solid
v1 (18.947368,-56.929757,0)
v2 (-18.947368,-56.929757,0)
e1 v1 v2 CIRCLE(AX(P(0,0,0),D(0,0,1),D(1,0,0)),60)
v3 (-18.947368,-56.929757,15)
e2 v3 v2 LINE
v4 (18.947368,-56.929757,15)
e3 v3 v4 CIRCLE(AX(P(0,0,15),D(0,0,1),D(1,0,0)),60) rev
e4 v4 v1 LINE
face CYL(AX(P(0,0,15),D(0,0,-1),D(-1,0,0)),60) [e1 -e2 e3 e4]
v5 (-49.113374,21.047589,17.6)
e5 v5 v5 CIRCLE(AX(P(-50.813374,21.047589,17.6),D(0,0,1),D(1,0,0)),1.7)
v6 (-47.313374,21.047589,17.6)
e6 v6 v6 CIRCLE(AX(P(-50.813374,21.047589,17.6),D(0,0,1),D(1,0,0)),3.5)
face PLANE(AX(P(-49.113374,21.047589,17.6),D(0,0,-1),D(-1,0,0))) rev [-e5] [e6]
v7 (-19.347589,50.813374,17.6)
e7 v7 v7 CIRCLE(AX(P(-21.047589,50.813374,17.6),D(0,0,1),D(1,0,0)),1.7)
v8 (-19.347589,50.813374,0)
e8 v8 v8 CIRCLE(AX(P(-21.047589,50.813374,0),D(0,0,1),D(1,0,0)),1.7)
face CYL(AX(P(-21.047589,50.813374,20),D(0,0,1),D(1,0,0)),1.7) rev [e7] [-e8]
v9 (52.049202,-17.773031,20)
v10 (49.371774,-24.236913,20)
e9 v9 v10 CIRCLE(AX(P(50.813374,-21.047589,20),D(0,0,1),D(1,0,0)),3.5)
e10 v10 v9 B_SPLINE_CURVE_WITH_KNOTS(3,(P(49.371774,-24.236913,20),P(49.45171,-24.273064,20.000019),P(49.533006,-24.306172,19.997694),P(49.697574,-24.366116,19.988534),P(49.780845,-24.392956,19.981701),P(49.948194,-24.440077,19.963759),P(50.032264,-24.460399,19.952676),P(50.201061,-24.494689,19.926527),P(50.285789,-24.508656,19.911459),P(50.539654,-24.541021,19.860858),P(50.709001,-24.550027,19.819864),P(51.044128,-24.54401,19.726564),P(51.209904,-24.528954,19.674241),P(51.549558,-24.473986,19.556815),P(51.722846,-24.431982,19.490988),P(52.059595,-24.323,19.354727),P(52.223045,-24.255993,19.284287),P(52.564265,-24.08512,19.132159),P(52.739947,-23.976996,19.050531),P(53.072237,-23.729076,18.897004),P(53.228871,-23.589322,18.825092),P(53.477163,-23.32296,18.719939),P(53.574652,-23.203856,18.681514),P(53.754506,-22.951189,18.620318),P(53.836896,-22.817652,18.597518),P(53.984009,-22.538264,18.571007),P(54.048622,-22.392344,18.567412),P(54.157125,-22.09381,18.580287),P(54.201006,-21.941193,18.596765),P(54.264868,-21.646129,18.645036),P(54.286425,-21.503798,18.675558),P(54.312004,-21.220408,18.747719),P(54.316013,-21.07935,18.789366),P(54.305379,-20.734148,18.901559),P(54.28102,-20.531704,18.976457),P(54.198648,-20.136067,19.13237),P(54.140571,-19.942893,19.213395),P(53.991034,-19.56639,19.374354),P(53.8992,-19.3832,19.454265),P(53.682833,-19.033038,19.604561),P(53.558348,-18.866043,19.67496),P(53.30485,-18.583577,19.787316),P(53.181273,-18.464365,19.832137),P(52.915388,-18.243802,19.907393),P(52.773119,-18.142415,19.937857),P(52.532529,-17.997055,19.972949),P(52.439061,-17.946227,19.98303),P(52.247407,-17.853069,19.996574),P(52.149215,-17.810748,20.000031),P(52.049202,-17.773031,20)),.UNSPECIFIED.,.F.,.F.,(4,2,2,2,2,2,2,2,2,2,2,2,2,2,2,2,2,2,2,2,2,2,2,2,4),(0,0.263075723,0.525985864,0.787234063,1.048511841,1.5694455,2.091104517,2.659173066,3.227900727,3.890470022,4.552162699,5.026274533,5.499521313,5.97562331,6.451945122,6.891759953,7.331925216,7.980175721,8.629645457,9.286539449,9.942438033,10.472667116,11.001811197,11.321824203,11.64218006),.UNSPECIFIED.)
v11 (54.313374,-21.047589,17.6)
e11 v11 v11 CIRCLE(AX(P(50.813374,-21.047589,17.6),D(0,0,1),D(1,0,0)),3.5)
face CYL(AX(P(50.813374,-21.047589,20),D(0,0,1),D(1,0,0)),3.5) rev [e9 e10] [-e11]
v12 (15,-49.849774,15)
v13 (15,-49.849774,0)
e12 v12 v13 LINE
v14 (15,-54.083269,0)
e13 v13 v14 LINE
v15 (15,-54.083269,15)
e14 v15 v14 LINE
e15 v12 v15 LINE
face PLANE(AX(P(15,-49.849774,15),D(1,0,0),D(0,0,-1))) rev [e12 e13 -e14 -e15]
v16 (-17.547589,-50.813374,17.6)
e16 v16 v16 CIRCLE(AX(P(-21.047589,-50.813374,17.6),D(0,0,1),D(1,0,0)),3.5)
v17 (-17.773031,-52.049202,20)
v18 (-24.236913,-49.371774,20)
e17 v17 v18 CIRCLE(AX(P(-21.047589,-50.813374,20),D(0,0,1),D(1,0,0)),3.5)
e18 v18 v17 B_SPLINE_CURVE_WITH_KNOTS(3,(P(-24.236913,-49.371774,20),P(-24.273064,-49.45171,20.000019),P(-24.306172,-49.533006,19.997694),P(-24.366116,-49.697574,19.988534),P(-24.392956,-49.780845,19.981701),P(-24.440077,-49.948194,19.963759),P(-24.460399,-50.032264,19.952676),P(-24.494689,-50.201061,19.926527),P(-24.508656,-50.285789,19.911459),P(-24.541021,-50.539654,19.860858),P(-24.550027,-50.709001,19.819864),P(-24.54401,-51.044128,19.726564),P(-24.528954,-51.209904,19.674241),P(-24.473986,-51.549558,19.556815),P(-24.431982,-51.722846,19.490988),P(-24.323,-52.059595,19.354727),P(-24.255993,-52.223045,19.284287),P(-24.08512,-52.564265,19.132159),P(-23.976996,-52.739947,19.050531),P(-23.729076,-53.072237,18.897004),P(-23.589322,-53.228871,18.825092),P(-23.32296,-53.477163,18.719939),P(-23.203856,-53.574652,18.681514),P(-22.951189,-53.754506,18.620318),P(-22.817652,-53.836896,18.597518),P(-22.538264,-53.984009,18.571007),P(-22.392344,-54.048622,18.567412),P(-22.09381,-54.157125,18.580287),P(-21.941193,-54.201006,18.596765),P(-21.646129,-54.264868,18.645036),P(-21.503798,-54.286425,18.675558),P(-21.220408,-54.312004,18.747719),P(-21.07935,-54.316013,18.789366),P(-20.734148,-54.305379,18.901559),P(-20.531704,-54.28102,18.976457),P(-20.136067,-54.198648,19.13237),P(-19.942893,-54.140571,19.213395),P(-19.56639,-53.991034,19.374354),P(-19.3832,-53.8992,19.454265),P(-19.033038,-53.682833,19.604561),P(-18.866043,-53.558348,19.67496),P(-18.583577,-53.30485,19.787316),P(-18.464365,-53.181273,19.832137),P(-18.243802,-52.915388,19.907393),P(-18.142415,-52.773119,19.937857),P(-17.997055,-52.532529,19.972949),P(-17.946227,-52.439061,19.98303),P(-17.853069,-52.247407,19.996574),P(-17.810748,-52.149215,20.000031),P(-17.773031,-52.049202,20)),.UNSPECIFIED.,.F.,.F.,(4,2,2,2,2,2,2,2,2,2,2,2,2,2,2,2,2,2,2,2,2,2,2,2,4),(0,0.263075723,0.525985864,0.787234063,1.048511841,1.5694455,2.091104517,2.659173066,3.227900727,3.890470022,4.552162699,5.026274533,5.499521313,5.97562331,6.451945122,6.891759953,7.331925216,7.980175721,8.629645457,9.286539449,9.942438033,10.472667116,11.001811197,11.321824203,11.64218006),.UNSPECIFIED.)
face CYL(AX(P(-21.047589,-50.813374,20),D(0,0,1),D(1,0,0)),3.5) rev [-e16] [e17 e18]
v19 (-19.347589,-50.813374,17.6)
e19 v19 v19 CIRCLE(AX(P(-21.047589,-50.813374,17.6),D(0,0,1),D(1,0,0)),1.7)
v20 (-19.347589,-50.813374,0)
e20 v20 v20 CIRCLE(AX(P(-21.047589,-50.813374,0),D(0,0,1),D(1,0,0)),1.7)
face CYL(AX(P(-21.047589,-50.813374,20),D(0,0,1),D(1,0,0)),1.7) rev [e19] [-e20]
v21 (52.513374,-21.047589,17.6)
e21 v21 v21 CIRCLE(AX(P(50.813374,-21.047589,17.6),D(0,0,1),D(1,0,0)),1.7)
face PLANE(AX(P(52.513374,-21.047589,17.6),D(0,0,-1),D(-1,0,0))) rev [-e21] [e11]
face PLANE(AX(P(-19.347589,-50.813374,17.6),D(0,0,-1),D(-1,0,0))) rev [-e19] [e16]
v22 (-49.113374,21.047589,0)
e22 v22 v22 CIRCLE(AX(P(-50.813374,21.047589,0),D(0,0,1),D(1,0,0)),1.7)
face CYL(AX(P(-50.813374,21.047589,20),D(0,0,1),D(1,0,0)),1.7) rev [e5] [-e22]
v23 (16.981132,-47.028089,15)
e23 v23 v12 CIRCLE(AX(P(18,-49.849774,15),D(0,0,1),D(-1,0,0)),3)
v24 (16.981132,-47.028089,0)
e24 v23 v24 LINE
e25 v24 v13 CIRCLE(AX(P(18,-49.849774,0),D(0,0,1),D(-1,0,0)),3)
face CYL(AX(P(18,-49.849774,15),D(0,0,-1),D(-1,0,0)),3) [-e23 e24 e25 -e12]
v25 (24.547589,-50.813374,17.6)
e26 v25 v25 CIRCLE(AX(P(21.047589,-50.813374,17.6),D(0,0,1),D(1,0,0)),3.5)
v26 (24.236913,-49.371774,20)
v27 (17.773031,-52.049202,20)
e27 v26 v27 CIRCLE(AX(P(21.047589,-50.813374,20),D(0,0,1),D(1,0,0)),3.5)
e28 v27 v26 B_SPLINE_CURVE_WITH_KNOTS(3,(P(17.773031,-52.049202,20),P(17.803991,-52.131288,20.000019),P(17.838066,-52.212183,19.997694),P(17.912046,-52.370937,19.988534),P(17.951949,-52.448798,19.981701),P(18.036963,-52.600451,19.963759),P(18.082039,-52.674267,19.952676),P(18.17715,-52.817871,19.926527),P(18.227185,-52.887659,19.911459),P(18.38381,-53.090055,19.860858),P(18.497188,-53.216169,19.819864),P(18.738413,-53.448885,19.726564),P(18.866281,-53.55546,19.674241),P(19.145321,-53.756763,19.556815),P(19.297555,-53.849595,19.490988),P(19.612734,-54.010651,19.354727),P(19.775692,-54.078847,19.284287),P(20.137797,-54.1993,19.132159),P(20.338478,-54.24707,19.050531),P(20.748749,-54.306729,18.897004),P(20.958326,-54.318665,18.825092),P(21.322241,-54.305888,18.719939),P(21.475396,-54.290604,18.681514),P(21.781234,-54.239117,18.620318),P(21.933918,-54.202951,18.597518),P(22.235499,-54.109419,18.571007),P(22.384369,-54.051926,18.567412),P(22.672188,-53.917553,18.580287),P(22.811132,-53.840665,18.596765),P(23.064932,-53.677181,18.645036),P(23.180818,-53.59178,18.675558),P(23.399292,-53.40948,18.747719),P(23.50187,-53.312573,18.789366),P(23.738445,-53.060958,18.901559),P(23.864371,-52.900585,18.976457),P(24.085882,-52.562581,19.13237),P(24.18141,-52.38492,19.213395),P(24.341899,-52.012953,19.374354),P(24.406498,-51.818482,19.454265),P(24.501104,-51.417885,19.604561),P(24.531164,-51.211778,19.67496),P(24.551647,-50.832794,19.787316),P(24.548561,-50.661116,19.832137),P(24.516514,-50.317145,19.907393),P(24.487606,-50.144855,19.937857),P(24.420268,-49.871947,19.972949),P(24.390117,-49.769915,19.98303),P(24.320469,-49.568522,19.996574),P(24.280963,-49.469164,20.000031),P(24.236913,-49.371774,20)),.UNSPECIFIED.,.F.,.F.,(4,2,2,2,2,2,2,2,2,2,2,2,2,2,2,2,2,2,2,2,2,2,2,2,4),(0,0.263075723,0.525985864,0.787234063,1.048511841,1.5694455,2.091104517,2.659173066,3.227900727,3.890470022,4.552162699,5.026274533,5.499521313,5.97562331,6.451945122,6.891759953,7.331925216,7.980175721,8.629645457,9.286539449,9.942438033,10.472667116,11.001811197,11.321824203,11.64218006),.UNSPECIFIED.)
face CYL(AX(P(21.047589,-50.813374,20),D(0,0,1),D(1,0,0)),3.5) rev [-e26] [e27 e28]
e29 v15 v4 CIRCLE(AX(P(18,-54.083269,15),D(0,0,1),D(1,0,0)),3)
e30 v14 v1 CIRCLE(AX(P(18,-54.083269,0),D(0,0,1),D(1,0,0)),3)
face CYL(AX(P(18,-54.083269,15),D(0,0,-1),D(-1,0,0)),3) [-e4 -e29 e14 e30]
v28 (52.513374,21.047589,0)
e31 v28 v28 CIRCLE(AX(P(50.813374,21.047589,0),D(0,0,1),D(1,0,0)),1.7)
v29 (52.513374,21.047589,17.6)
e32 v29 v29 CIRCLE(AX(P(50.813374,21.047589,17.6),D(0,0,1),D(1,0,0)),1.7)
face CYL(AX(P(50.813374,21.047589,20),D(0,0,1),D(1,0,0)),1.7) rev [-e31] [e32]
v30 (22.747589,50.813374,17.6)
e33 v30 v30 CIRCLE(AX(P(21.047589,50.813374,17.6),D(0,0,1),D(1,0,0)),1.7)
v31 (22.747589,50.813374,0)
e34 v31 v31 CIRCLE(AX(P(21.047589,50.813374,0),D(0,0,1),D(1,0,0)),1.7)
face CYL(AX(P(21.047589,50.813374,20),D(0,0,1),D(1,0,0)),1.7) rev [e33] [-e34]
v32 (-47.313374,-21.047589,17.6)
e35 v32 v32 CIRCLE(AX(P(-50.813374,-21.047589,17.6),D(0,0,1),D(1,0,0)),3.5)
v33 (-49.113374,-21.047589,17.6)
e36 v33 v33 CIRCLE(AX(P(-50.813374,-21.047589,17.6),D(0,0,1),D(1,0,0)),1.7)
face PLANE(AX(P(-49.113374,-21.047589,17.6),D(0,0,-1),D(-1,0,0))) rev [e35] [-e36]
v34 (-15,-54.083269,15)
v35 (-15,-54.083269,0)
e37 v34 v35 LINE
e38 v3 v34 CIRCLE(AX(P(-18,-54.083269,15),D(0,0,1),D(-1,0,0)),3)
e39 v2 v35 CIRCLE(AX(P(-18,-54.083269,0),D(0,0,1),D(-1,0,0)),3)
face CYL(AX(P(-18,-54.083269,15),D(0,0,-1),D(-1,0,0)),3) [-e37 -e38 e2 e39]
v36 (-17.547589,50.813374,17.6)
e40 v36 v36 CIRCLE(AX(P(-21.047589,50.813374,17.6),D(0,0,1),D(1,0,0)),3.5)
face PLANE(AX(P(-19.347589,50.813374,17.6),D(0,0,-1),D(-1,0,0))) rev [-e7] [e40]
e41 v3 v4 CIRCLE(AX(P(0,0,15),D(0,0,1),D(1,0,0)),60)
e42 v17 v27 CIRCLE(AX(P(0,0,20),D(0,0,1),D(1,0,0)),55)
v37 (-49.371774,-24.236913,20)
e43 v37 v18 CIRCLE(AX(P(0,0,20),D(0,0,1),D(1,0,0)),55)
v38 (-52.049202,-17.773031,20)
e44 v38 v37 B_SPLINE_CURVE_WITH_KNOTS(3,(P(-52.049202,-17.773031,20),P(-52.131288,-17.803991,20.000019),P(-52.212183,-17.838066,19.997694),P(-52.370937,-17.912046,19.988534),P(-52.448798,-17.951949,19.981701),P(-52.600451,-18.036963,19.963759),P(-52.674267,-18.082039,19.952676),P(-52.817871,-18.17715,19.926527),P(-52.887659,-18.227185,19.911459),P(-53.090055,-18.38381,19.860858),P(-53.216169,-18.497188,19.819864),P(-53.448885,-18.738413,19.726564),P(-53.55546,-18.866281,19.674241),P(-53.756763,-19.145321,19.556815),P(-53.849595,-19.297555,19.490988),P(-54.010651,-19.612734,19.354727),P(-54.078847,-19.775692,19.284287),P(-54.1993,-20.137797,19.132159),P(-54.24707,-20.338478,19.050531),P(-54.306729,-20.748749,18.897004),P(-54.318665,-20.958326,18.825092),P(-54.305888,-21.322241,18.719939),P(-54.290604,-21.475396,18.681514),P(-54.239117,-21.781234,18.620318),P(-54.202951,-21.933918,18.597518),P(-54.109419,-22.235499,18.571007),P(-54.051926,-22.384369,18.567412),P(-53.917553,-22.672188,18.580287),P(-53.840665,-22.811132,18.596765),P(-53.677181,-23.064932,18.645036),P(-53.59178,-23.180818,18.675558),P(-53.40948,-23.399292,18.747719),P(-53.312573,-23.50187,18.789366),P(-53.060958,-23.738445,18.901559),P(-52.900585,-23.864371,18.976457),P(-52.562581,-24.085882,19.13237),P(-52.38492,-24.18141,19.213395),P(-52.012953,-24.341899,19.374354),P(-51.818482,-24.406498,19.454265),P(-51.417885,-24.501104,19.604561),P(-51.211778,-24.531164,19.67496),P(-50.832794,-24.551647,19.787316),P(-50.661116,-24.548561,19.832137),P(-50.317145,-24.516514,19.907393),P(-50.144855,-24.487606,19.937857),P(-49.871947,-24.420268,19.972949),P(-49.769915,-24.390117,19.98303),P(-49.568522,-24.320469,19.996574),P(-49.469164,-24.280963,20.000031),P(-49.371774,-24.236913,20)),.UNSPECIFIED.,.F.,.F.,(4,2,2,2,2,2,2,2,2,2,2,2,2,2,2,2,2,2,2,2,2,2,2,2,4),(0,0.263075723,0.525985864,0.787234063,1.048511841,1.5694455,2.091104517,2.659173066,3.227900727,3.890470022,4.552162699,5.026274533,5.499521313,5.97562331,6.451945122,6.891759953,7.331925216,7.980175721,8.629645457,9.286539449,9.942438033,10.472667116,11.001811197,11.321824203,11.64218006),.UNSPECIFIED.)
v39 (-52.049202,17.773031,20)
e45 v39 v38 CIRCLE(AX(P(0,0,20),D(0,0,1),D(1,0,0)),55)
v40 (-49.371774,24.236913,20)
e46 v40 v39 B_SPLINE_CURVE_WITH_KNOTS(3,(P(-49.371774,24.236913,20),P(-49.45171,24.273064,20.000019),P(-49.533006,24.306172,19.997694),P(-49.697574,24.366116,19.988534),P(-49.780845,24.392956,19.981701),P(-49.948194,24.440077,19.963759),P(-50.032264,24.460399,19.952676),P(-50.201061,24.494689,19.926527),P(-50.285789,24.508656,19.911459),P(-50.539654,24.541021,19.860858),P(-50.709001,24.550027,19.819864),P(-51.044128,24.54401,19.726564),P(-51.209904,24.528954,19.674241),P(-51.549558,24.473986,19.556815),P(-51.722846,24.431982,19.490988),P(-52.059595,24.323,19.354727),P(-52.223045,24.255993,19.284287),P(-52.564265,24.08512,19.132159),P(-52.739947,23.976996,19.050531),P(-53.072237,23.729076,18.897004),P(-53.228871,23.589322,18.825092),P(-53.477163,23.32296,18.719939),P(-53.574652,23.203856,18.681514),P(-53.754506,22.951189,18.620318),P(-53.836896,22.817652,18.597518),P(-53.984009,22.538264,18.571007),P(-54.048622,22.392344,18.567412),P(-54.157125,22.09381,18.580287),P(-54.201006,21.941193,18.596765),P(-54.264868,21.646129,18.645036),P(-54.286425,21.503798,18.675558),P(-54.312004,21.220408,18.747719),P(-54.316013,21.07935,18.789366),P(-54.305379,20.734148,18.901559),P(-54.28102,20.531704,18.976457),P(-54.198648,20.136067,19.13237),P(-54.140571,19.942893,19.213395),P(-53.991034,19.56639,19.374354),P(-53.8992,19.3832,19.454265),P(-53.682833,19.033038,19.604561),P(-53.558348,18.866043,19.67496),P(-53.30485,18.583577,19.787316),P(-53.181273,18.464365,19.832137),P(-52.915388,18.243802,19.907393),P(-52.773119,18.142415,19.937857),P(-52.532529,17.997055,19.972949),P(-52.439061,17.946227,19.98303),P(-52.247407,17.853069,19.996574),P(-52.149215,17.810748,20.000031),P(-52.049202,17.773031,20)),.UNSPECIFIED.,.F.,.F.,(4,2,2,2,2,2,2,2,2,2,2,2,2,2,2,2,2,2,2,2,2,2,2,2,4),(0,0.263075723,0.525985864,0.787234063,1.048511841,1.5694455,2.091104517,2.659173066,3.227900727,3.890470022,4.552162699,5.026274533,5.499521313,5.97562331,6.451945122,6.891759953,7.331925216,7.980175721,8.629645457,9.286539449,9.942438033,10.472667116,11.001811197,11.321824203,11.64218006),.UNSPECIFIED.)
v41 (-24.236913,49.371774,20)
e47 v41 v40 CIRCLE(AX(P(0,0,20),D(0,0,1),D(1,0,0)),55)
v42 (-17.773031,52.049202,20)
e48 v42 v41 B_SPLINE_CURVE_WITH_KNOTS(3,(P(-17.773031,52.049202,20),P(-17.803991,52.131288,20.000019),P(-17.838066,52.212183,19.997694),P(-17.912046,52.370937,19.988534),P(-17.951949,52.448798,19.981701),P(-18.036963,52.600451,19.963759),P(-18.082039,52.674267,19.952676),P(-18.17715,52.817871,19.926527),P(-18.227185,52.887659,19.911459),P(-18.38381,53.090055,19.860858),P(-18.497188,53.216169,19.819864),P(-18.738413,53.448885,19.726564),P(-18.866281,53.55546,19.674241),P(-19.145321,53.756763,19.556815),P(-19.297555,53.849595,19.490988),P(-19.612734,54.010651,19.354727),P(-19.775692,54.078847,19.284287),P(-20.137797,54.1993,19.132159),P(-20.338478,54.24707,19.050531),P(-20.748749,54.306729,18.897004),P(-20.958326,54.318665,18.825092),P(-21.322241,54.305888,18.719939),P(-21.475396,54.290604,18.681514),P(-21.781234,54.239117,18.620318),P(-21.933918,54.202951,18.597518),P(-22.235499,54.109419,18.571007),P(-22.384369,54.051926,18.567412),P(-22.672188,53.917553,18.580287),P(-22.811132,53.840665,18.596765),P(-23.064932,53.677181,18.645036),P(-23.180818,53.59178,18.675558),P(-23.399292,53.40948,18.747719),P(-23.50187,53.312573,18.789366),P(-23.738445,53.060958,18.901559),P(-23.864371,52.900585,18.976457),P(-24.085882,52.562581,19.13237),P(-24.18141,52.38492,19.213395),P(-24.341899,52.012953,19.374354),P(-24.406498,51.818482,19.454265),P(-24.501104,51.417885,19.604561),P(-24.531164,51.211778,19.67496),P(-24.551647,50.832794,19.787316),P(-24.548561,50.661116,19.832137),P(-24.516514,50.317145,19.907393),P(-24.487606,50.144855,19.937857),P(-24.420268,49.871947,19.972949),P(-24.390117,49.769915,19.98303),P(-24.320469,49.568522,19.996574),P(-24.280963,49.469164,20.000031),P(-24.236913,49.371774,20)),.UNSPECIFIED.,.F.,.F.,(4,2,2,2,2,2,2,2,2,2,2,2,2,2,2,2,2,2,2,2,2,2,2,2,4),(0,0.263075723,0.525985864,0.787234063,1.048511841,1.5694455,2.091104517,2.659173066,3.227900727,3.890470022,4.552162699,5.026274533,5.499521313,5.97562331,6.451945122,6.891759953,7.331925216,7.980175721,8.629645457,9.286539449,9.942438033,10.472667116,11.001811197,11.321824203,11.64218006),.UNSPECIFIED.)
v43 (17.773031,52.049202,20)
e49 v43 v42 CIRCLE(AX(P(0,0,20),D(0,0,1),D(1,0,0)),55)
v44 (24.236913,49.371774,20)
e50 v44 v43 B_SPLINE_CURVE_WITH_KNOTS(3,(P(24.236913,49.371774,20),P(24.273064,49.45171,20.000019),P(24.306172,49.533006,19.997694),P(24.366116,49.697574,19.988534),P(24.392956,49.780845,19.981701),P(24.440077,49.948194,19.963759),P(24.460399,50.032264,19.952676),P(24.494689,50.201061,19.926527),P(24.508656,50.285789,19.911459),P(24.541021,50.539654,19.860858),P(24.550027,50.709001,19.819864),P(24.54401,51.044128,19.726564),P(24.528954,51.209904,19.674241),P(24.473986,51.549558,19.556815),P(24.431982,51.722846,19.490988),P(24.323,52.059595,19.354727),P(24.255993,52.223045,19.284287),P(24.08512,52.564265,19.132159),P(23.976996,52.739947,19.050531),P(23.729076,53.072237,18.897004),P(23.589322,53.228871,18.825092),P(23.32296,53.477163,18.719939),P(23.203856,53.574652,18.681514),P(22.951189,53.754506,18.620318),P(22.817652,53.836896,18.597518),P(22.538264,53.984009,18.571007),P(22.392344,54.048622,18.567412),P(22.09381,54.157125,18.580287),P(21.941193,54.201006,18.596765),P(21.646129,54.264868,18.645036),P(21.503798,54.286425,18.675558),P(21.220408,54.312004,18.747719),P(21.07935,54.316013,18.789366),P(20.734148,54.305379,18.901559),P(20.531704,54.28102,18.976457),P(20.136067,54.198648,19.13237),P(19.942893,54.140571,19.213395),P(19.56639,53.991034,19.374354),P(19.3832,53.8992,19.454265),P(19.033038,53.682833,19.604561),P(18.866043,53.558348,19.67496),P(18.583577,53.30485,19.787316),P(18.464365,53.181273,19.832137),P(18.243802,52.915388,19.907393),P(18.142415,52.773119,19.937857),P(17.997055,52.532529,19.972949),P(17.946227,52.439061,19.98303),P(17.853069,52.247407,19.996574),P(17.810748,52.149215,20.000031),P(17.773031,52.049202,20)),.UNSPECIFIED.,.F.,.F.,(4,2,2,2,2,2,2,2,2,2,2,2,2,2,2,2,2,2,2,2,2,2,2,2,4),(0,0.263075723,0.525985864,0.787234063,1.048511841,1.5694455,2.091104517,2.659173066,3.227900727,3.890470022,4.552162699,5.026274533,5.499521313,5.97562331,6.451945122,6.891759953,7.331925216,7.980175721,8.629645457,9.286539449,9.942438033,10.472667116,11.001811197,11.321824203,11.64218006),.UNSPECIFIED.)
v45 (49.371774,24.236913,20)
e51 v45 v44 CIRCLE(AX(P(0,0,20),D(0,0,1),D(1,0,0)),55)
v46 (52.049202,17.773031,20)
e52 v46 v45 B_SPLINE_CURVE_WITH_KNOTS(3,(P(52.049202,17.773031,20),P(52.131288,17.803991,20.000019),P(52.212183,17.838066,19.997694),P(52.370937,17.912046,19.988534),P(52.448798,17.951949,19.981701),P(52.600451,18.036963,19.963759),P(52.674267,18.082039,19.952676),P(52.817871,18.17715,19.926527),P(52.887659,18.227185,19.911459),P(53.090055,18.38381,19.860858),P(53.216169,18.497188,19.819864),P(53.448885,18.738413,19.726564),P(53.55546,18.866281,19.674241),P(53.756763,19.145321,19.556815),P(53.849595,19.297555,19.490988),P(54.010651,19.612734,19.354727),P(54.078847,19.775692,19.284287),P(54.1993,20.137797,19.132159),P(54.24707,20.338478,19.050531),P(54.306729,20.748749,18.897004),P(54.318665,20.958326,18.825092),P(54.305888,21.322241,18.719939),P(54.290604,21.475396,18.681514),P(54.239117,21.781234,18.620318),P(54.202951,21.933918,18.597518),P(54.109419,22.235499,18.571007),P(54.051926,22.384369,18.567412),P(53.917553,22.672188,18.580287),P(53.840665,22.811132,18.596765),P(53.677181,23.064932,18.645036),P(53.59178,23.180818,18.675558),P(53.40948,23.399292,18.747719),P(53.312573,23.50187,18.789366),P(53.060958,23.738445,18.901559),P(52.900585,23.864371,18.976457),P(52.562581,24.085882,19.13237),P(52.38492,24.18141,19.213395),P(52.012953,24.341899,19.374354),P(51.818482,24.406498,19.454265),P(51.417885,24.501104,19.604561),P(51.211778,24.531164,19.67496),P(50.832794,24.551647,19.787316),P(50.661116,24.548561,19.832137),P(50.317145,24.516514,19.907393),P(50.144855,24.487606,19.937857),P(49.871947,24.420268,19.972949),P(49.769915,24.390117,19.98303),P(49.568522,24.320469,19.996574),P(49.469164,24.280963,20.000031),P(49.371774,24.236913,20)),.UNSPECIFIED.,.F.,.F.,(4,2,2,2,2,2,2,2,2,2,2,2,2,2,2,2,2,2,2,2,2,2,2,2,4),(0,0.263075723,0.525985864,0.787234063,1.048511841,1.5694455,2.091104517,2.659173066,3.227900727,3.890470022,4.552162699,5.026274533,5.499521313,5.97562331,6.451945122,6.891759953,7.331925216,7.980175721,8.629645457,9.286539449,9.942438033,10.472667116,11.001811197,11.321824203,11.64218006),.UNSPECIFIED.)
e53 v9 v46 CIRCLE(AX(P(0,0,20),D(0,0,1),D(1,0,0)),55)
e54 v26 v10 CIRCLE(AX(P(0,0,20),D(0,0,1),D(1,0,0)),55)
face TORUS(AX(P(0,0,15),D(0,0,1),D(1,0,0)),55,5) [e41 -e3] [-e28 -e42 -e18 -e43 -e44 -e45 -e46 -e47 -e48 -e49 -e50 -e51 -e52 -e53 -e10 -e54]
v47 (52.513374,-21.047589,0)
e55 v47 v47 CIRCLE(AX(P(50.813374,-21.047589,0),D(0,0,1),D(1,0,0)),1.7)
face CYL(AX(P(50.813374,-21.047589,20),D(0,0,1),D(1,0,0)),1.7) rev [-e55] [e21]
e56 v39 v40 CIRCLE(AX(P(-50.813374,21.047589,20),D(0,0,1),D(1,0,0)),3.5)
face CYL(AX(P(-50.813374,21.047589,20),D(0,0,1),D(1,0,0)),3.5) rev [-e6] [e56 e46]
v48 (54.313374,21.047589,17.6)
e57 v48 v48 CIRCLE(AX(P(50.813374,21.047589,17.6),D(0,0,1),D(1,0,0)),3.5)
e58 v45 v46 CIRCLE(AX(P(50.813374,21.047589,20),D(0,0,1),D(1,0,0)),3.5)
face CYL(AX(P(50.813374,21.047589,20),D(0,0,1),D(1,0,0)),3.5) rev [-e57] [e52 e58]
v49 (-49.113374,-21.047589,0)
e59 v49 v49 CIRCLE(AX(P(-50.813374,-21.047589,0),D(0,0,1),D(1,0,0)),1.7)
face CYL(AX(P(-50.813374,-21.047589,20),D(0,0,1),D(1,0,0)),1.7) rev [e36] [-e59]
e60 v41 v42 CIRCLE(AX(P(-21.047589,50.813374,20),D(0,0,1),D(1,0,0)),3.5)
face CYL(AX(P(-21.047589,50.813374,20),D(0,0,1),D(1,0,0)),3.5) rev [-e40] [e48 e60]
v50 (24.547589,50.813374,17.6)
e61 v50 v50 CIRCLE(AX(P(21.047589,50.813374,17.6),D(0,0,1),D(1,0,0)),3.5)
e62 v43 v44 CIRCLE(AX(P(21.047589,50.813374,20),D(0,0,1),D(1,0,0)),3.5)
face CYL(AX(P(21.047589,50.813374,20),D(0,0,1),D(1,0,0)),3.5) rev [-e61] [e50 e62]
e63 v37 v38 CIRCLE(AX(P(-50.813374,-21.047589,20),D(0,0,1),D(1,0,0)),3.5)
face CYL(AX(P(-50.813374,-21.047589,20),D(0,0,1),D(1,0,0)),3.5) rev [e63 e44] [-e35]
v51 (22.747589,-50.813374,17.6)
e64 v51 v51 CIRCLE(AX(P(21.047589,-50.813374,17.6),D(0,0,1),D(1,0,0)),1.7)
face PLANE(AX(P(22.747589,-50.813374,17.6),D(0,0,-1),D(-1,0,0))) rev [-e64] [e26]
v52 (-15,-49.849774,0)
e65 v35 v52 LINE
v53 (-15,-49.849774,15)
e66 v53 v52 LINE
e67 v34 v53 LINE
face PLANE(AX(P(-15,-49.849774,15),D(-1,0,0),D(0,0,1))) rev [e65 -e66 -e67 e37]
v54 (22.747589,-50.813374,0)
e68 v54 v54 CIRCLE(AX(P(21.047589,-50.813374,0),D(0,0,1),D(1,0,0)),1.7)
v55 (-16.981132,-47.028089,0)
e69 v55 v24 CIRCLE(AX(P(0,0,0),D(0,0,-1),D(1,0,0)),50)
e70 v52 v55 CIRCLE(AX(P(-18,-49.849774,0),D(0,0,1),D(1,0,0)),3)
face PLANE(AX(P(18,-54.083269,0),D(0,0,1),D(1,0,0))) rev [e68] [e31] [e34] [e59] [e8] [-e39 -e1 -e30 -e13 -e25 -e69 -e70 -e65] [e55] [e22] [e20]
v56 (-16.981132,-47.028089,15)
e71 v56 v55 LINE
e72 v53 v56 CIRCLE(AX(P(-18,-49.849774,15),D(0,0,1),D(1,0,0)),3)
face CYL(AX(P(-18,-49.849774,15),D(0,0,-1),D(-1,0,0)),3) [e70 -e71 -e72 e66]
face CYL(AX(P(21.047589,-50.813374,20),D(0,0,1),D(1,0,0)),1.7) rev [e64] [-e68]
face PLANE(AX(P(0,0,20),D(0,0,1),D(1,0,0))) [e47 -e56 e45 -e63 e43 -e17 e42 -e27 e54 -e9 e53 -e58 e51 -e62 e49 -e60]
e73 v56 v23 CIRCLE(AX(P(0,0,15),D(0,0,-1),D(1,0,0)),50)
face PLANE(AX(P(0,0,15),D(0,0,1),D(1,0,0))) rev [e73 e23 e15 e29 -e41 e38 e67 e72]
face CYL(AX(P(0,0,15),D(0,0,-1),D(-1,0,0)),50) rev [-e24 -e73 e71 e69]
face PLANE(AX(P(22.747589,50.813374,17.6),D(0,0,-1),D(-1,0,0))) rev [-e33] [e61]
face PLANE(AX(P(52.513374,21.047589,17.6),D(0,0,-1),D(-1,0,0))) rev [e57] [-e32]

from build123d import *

# Parameters (mm, degrees)
SALIENTE_EXTRUIR1_DEPTH                              = 15
CROQUIS2_R                                           = 60
SALIENTE_EXTRUIR2_DEPTH                              = 5
REFRENTADO_PARA_TORNILLO_CON_CABEZA_TRON_D           = 3.4
REFRENTADO_PARA_TORNILLO_CON_CABEZA_TRON_CBORE_D     = 7
REFRENTADO_PARA_TORNILLO_CON_CABEZA_TRON_CBORE_DEPTH = 2.4
REDONDEO1_R                                          = 5


with BuildPart() as part:
    # Croquis1 → Saliente-Extruir1 (new body)
    with BuildSketch(Plane.XY):
        with BuildLine():
            Line((-15, -49.849774322), (-15, -54.083269132))
            ThreePointArc((-15, -54.083269132), (-16.245307044, -56.516590449), (-18.947368421, -56.929756981))
            ThreePointArc((-18.947368421, -56.929756981), (0, 60), (18.947368421, -56.929756981))
            ThreePointArc((18.947368421, -56.929756981), (16.245307044, -56.516590449), (15, -54.083269132))
            Line((15, -54.083269132), (15, -49.849774322))
            ThreePointArc((15, -49.849774322), (15.544739955, -48.125912926), (16.981132075, -47.028088983))
            ThreePointArc((16.981132075, -47.028088983), (0, 50), (-16.981132075, -47.028088983))
            ThreePointArc((-16.981132075, -47.028088983), (-15.544739955, -48.125912926), (-15, -49.849774322))
        make_face()
    extrude(amount=SALIENTE_EXTRUIR1_DEPTH)

    # Croquis2 → Saliente-Extruir2 (add)
    with BuildSketch(Plane.XY.offset(15)):
        with Locations(Location((0, 0, 0), (0, 0, 251.591519829))):
            Circle(CROQUIS2_R)
    extrude(amount=SALIENTE_EXTRUIR2_DEPTH)

    # Refrentado para tornillo con cabeza troncocónica de M31 (through all)
    with Locations(Plane.XY.offset(20)):
        with Locations((-21.04758878, 50.813374288), (21.04758878, 50.813374288), (50.813374288, 21.04758878), (50.813374288, -21.04758878), (21.04758878, -50.813374288), (-21.04758878, -50.813374288), (-50.813374288, -21.04758878), (-50.813374288, 21.04758878)):
            CounterBoreHole(REFRENTADO_PARA_TORNILLO_CON_CABEZA_TRON_D / 2, REFRENTADO_PARA_TORNILLO_CON_CABEZA_TRON_CBORE_D / 2, REFRENTADO_PARA_TORNILLO_CON_CABEZA_TRON_CBORE_DEPTH)

    # Redondeo1
    # the kernel refuses this fillet: 5 mm, written as the material it takes off along each edge
    with BuildSketch(Plane(origin=(0, 0, 20), x_dir=(-0.31578947369106963, -0.9488292830145564, 0), z_dir=(-0.9488292830145564, 0.31578947369106963, 0))) as redondeo1_piece_1:
        with BuildLine():
            CenterArc((60 - REDONDEO1_R, -REDONDEO1_R), REDONDEO1_R, 0, 90)
            Line((60 - REDONDEO1_R, 0), (60, 0))
            Line((60, 0), (60, -REDONDEO1_R))
        make_face()
    revolve(axis=Axis((0, 0, 20), (0, 0, 1)), mode=Mode.SUBTRACT)


solid = part.part
